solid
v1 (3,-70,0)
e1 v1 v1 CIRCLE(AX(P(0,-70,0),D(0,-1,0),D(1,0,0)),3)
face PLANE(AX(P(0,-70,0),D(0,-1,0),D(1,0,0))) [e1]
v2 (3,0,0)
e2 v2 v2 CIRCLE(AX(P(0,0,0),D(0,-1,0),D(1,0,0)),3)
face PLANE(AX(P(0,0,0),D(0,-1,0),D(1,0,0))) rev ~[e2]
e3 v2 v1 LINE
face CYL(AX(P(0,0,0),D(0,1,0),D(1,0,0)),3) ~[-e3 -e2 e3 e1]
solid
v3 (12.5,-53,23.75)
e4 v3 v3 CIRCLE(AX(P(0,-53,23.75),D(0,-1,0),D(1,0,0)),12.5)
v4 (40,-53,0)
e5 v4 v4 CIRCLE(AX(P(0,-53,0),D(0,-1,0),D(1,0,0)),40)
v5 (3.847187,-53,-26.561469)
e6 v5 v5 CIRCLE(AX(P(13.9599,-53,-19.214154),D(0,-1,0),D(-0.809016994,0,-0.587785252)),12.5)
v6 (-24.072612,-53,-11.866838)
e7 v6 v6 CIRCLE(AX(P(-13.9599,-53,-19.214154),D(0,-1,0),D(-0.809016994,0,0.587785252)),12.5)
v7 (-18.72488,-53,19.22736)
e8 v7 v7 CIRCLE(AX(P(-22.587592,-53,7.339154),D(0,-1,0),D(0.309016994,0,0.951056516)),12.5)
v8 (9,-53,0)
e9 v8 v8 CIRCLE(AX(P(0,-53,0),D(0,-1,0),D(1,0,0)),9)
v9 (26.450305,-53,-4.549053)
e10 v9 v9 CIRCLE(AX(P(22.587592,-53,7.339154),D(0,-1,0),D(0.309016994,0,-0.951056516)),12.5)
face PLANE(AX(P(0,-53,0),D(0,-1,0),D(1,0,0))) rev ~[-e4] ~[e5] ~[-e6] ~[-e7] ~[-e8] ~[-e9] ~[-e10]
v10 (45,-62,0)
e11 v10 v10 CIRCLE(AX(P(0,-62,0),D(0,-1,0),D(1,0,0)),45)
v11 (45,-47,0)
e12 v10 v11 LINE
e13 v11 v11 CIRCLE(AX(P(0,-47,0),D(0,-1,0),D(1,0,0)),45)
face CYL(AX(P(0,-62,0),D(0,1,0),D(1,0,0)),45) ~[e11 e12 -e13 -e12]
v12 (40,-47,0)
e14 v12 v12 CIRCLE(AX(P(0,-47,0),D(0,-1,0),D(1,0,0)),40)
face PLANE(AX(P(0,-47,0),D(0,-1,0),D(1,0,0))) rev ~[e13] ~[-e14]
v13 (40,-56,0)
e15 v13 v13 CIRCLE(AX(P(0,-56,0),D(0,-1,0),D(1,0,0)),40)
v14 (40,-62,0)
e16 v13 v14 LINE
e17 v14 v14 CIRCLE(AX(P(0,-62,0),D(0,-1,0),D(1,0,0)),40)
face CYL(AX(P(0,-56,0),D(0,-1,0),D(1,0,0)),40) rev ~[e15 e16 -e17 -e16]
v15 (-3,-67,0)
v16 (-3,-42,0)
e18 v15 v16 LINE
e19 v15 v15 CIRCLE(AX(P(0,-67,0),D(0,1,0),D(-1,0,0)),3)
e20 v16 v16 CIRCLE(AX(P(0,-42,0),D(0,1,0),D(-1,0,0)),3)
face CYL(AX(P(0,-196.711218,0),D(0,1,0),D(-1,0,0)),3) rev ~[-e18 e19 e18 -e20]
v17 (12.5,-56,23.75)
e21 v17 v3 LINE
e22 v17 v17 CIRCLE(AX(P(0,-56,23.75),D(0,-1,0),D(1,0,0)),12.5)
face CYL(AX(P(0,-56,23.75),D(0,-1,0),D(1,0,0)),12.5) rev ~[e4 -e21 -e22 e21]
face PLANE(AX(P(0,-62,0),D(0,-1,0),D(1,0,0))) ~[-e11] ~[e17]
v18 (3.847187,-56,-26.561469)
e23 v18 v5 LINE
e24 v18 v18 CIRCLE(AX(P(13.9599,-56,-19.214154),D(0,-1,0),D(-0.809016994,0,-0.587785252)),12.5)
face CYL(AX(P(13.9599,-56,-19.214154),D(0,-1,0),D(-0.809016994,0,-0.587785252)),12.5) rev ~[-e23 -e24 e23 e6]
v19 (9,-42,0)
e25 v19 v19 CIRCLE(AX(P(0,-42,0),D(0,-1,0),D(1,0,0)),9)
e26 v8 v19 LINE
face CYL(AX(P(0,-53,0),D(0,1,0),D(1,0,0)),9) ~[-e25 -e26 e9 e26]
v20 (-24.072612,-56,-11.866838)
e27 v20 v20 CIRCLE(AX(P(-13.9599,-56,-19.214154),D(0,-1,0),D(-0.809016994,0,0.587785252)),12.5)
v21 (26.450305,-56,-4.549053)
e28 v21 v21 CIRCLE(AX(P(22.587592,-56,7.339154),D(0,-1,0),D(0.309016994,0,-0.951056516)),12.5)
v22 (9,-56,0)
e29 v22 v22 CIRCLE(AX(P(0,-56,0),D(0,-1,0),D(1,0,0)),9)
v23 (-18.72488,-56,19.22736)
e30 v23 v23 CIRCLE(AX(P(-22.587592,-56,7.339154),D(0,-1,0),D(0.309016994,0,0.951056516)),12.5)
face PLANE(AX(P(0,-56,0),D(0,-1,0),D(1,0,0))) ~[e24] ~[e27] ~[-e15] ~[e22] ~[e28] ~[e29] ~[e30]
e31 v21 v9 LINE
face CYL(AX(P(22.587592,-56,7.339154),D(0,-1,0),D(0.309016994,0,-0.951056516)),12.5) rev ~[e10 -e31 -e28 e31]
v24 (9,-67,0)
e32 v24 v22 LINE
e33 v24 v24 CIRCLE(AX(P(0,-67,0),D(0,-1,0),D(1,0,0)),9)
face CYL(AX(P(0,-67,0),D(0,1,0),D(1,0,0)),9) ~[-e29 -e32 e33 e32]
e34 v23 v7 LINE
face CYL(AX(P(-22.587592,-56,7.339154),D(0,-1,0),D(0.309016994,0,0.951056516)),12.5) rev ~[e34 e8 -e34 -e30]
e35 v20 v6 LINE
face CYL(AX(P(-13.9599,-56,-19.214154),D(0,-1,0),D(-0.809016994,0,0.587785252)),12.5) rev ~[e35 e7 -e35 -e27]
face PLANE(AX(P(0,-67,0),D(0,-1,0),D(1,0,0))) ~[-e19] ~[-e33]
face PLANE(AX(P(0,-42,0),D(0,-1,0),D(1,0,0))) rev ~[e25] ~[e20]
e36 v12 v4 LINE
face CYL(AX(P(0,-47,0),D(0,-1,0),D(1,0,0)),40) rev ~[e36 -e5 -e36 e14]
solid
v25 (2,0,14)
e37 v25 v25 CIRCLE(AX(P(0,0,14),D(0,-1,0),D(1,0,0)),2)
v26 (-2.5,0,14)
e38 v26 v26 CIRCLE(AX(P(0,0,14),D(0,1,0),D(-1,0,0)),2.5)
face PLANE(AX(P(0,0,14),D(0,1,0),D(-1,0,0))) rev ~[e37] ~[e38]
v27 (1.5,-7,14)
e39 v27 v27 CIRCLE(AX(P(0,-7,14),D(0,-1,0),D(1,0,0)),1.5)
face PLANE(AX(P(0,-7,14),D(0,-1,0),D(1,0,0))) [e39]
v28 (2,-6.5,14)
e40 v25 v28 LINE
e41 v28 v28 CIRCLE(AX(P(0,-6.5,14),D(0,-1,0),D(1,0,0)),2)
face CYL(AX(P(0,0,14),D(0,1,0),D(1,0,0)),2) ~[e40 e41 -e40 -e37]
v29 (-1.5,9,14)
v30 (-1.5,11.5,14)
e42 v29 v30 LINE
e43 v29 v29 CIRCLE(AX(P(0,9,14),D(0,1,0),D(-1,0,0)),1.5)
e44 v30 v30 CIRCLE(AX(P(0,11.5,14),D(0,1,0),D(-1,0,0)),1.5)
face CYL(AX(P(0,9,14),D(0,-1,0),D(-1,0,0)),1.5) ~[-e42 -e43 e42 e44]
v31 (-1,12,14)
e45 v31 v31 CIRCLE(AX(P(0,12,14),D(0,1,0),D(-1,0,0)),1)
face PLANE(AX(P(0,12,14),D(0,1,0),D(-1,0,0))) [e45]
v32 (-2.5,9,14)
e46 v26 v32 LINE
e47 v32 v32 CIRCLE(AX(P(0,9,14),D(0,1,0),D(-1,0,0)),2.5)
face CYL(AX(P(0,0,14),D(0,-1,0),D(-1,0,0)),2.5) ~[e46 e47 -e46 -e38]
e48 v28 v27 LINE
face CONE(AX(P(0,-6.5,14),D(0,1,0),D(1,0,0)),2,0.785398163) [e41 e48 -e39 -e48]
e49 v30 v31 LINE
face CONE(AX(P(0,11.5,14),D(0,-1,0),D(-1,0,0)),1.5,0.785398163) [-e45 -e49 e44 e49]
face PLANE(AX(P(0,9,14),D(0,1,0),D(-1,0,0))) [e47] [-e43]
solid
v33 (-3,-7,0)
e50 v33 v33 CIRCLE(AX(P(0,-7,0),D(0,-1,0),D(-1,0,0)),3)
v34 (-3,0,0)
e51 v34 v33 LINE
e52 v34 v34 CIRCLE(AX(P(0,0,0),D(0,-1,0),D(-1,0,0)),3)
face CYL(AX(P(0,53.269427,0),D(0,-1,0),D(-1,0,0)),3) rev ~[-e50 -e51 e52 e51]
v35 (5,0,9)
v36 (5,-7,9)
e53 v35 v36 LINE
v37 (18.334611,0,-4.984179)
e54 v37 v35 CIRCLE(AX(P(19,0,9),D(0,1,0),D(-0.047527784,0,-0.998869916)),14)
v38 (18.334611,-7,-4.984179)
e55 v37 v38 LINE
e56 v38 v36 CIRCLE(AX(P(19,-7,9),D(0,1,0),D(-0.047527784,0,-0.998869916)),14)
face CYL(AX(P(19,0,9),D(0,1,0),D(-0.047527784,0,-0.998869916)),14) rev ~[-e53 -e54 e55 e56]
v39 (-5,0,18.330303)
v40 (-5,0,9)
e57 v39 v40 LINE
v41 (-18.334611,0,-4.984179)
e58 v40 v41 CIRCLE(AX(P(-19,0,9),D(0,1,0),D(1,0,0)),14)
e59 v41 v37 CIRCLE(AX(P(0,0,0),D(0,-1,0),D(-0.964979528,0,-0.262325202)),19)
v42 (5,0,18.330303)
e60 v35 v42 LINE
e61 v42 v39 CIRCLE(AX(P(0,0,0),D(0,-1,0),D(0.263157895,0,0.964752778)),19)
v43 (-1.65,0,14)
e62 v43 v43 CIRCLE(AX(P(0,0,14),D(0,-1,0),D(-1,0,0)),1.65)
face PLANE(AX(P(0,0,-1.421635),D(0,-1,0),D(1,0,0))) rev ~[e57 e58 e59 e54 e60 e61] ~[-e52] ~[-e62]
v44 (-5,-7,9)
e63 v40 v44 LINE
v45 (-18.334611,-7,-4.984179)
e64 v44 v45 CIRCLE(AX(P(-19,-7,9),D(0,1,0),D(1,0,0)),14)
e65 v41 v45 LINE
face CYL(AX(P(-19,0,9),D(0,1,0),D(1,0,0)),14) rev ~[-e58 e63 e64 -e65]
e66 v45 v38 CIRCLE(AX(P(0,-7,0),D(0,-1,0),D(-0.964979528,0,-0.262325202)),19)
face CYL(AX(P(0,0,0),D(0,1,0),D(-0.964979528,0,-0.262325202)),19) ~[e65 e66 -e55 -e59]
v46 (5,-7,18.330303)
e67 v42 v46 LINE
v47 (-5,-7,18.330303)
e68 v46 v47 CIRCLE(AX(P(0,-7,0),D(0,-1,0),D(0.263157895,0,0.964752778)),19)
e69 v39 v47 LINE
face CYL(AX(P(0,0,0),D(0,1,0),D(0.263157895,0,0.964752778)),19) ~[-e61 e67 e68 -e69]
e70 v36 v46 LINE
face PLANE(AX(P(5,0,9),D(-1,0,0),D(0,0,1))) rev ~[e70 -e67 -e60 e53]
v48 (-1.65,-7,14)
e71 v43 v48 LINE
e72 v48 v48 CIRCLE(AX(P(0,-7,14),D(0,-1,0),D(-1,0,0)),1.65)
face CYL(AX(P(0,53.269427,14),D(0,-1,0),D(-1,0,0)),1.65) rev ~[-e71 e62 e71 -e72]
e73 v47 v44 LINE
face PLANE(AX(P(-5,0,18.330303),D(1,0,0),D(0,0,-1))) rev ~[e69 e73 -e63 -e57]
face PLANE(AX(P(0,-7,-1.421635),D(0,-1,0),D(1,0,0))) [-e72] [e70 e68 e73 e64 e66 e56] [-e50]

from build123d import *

# Parameters (mm, degrees)
F1_DEPTH         = 7
F2_D             = 6
F3_D             = 3.3
F4_R             = 2.5
F5_DEPTH         = 9
F6_R             = 2
F7_DEPTH         = 7
F8_R             = 1.5
F9_DEPTH         = 3
F10_SIZE         = 0.5
F11_R            = 3
F12_DEPTH        = 70
F16_D            = 6
F17_R            = 12.5
F18_DEPTH        = 68.001
F18_COPIES_COUNT = 5


# Not quite as in the source:
# - a pattern or mirror of a feature is missing from the dataset's text; its kind, count and spacing are read off the source's solid


with BuildPart() as f1:
    # F0 (on Front) → F1 (new body)
    with BuildSketch(Plane.XZ):
        with BuildLine():
            Line((5, 9), (5, 18.3303027798))
            ThreePointArc((5, 18.3303027798), (0, 19), (-5, 18.3303027798))
            Line((-5, 18.3303027798), (-5, 9))
            ThreePointArc((-5, 9), (-8.8679852531, -0.6613807072), (-18.3346110241, -4.9841788286))
            ThreePointArc((-18.3346110241, -4.9841788286), (0, -19), (18.3346110241, -4.9841788286))
            ThreePointArc((18.3346110241, -4.9841788286), (8.8679852531, -0.6613807072), (5, 9))
        make_face()
    extrude(amount=F1_DEPTH)

    # F2 (through all)
    with Locations(Plane(origin=(0, 0, 0), x_dir=(1, 0, 0), z_dir=(0, 1, 0))):
        with Locations((0, 0)):
            Hole(F2_D / 2)

    # F3 (through all)
    with Locations(Plane(origin=(0, 0, 0), x_dir=(1, 0, 0), z_dir=(0, 1, 0))):
        with Locations((0, -14)):
            Hole(F3_D / 2)


with BuildPart() as f5:
    # F4 (on face) → F5 (new body)
    with BuildSketch(Plane(origin=(0, 0, 0), x_dir=(-1, 0, 0), z_dir=(0, 1, 0))):
        with Locations((0, 14)):
            Circle(F4_R)
    extrude(amount=F5_DEPTH)

    # F6 (on face) → F7 (join)
    with BuildSketch(Plane.XZ):
        with Locations((0, 14)):
            Circle(F6_R)
    extrude(amount=F7_DEPTH)

    # F8 (on face) → F9 (join)
    with BuildSketch(Plane(origin=(0, 9, 0), x_dir=(-1, 0, 0), z_dir=(0, 1, 0))):
        with Locations((0, 14)):
            Circle(F8_R)
    extrude(amount=F9_DEPTH)

    # F10
    f10_edges = [f5.edges().sort_by_distance(p)[0] for p in [
        (1.5, 12, 14),
        (-2, -7, 14),
    ]]
    chamfer(f10_edges, length=F10_SIZE)


with BuildPart() as f12:
    # F11 (on Front) → F12 (new body)
    with BuildSketch(Plane.XZ):
        Circle(F11_R)
    extrude(amount=F12_DEPTH)


with BuildPart() as f14:
    # F13 (on Top) → F14 (revolve)
    with BuildSketch(Plane.XY):
        Polygon((0, -42), (0, -67), (9, -67), (9, -56), (40, -56), (40, -62), (45, -62), (45, -47), (40, -47), (40, -53), (9, -53), (9, -42), align=None)
    revolve(axis=Axis((0, -63.0867569871, 0), (0, -1, 0)))

    # F16 (through all)
    with Locations(Plane.XZ.offset(67)):
        with Locations((0, 0)):
            Hole(F16_D / 2)

    # F17 (on face) → F18 (cut, through all)
    with BuildSketch(Plane.XZ.offset(56)):
        with Locations((0, 23.75)):
            Circle(F17_R)
    f18 = extrude(amount=-F18_DEPTH, mode=Mode.SUBTRACT)

    # F18_copies: F18 ×5 about axis
    f18_copies_axis = Axis((0, 0, 0), (0, 1, 0))
    for i in range(1, F18_COPIES_COUNT):
        add(f18.rotate(f18_copies_axis, i * 360 / F18_COPIES_COUNT), mode=Mode.SUBTRACT)


solid = Compound([f1.part, f5.part, f12.part, f14.part])
